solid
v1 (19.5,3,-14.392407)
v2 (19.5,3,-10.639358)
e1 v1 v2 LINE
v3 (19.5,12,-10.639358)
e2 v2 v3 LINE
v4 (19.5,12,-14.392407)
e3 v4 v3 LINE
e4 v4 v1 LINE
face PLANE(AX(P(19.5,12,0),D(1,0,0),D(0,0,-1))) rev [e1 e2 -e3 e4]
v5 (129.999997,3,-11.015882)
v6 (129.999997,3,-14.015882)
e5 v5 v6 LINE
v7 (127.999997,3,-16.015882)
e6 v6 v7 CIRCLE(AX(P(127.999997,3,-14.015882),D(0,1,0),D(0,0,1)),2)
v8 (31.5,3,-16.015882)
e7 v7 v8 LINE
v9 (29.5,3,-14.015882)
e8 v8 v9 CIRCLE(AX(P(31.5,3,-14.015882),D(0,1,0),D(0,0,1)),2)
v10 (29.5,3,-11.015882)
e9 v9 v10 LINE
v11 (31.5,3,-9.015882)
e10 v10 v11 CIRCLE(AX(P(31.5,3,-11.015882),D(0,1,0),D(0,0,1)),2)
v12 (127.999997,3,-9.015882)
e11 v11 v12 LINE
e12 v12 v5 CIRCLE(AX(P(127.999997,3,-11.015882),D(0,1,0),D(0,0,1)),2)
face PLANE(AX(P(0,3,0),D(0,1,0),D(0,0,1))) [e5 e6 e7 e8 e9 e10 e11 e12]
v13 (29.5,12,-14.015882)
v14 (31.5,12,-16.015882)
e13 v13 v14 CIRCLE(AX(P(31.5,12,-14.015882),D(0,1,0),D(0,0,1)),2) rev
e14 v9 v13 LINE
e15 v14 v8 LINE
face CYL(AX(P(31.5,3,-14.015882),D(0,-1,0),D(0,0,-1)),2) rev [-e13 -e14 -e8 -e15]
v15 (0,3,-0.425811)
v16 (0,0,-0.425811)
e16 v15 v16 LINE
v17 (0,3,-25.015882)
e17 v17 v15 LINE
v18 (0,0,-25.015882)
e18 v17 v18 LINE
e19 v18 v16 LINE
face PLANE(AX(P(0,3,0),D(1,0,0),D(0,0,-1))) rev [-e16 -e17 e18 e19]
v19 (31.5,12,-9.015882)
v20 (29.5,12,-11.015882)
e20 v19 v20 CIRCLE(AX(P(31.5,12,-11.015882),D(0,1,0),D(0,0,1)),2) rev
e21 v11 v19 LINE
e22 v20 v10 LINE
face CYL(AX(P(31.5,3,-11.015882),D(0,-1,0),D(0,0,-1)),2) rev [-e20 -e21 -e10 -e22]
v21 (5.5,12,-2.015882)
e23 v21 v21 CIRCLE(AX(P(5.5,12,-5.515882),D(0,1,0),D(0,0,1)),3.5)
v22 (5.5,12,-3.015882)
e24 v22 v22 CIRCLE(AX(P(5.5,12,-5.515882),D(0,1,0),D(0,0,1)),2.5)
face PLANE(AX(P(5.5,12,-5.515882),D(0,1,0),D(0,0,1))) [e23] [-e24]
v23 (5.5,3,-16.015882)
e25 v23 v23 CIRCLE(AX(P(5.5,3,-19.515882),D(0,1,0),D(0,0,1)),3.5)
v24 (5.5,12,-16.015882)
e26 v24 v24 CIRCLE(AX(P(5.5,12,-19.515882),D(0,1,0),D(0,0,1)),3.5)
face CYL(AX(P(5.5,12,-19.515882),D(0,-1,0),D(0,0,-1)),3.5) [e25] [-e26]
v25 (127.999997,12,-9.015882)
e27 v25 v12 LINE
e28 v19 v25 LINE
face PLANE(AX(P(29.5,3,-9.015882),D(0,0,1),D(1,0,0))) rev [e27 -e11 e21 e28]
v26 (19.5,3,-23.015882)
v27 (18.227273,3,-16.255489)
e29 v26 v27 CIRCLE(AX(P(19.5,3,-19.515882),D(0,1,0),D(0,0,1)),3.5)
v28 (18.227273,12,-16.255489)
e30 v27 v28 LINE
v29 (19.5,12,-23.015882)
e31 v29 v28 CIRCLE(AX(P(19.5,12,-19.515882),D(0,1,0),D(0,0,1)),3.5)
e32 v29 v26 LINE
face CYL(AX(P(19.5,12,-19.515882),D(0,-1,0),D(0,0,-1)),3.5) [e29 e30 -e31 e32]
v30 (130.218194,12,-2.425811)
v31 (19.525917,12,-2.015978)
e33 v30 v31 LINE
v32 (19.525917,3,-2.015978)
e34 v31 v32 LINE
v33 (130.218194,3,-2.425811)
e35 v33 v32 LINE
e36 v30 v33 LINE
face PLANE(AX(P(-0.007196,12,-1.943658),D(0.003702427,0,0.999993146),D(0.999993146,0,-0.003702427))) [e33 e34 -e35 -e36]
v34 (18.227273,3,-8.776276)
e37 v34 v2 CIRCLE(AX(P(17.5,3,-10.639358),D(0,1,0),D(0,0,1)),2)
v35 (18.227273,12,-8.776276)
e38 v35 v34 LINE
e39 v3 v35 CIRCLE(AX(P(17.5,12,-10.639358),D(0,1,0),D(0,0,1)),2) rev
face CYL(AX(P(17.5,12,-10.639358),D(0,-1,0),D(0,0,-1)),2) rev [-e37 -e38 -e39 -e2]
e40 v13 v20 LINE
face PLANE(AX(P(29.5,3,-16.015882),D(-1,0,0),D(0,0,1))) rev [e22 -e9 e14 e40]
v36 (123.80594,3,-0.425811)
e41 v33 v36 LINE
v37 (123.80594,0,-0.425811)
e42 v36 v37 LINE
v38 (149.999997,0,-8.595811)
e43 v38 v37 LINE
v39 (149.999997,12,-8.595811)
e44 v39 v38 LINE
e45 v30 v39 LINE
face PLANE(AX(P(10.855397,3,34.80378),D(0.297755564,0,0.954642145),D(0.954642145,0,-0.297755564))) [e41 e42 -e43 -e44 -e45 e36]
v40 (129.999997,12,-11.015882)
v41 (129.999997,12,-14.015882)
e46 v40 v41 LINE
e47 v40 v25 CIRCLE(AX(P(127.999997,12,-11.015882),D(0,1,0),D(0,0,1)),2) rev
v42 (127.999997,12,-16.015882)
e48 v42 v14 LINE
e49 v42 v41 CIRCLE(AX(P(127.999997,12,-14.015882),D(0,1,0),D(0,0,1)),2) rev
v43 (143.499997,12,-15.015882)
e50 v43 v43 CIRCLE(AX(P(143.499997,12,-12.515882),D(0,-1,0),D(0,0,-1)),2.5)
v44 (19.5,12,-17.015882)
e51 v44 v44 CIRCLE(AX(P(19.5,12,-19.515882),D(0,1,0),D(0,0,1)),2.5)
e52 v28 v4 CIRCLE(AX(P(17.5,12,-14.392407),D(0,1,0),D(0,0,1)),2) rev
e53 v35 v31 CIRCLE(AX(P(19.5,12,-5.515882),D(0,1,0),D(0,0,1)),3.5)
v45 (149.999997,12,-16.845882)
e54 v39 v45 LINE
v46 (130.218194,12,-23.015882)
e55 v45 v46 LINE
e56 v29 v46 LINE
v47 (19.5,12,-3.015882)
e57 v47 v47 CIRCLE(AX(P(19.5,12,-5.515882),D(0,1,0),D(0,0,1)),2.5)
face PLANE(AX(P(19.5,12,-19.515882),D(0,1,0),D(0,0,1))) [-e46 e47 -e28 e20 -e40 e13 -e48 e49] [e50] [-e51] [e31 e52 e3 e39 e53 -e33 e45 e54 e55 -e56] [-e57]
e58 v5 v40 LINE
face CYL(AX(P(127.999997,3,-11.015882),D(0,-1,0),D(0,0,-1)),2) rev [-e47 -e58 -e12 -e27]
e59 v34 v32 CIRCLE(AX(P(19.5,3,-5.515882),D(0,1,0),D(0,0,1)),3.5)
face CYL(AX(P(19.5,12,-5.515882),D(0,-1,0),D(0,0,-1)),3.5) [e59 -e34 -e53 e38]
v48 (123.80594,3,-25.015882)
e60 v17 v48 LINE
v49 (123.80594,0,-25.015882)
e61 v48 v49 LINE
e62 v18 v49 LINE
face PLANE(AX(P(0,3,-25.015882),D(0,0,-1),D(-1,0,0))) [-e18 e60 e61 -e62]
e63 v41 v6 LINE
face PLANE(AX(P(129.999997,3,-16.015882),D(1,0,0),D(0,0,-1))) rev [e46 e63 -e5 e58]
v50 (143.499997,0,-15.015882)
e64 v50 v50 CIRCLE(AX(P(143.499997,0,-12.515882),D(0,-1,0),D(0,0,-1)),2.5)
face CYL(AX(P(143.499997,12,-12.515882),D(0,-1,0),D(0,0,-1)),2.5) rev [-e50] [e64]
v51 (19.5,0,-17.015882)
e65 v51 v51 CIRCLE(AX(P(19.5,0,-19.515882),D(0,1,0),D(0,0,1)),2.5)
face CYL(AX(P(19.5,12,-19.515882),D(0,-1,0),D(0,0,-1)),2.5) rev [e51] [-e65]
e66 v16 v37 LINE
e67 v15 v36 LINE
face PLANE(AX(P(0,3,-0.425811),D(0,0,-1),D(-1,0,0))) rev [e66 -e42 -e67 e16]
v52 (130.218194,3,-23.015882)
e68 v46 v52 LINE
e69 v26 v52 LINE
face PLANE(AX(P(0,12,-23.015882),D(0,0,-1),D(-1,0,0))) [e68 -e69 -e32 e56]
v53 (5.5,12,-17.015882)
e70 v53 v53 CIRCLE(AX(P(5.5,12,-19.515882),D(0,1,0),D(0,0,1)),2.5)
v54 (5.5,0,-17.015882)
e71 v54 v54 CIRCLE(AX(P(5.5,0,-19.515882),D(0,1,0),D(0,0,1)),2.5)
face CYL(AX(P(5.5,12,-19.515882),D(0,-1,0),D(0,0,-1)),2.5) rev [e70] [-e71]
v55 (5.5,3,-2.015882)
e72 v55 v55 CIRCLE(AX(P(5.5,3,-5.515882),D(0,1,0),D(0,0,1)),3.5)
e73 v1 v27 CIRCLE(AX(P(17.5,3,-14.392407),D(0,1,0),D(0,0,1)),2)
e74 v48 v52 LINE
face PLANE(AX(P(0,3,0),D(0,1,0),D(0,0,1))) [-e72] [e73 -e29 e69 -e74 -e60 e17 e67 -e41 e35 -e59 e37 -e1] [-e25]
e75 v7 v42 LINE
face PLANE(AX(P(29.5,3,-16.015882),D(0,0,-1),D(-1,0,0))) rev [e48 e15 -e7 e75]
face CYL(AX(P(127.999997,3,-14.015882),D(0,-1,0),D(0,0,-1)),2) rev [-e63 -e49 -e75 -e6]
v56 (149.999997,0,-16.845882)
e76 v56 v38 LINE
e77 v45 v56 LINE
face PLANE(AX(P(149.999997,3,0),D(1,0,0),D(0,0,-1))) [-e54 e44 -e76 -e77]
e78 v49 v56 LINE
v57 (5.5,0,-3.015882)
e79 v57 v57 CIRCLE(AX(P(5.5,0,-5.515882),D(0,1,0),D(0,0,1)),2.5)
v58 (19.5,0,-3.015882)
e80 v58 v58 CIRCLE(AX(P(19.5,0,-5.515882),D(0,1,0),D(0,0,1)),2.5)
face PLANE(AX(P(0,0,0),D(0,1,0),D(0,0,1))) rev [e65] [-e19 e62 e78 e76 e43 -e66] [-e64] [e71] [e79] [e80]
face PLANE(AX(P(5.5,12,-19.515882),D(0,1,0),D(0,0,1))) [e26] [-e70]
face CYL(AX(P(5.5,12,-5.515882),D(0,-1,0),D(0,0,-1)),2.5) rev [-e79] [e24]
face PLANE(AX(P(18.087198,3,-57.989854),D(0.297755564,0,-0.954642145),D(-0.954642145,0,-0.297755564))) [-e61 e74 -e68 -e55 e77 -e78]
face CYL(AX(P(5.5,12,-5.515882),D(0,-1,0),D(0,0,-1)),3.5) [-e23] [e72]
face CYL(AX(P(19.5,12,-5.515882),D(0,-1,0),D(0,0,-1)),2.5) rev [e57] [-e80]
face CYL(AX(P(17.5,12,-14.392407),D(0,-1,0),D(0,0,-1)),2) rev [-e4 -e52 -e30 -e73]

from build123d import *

# Parameters (mm, degrees)
SKETCH_2_W          = 123.80594
SKETCH_2_H          = 24.590071156
EXTRUDE_2_DEPTH     = 3
SKETCH_3_R          = 3.5
SKETCH_3_R_2        = 2.5
EXTRUDE_3_DEPTH     = 9
EXTRUDE_4_DEPTH     = 9
SKETCH_7_W          = 100.499997397
SKETCH_7_H          = 7
CUT_EXTRUDE_1_DEPTH = 9
SKETCH_8_R          = 2.5
CUT_EXTRUDE_2_DEPTH = 153.544398733
FILLET_1_R          = 2
CUT_EXTRUDE_START   = -9
SKETCH_9_R          = 2.5
CUT_EXTRUDE_3_DEPTH = 9


# Read off the part's stored shape, not the designer's step: 凸台-拉伸4
with BuildPart() as part:
    # 草图2 → 凸台-拉伸2 (new body)
    with BuildSketch(Plane(origin=(0, 0, 0), x_dir=(1, 0, 0), z_dir=(0, 1, 0))):
        with Locations((61.90297, 12.720846688)):
            Rectangle(SKETCH_2_W, SKETCH_2_H)
        Polygon((149.999997397, 8.59581111), (123.80594, 0.42581111), (123.80594, 25.015882266), (149.999997397, 16.845882266), align=None)
    extrude(amount=EXTRUDE_2_DEPTH)

    # 草图3 → 凸台-拉伸3 (add)
    # profile 1 of 4: a face of its own
    with BuildSketch(Plane(origin=(0, 3, 0), x_dir=(1, 0, 0), z_dir=(0, 1, 0))):
        with Locations(Location((5.5, 19.515882266, 0), (0, 0, 270))):
            Circle(SKETCH_3_R)
        with Locations(Location((5.5, 19.515882266, 0), (0, 0, 270))):
            Circle(SKETCH_3_R_2, mode=Mode.SUBTRACT)
    # profile 2 of 4: a face of its own
    with BuildSketch(Plane(origin=(0, 3, 0), x_dir=(1, 0, 0), z_dir=(0, 1, 0))):
        with Locations(Location((19.5, 19.515882266, 0), (0, 0, 270))):
            Circle(SKETCH_3_R)
        with Locations(Location((19.5, 19.515882266, 0), (0, 0, 270))):
            Circle(SKETCH_3_R_2, mode=Mode.SUBTRACT)
    # profile 3 of 4: a face of its own
    with BuildSketch(Plane(origin=(0, 3, 0), x_dir=(1, 0, 0), z_dir=(0, 1, 0))):
        with Locations(Location((19.5, 5.515882266, 0), (0, 0, 270))):
            Circle(SKETCH_3_R)
        with Locations(Location((19.5, 5.515882266, 0), (0, 0, 270))):
            Circle(SKETCH_3_R_2, mode=Mode.SUBTRACT)
    # profile 4 of 4: a face of its own
    with BuildSketch(Plane(origin=(0, 3, 0), x_dir=(1, 0, 0), z_dir=(0, 1, 0))):
        with Locations(Location((5.5, 5.515882266, 0), (0, 0, 270))):
            Circle(SKETCH_3_R)
        with Locations(Location((5.5, 5.515882266, 0), (0, 0, 270))):
            Circle(SKETCH_3_R_2, mode=Mode.SUBTRACT)
    extrude(amount=EXTRUDE_3_DEPTH)

    # 凸台-拉伸4 outline → 凸台-拉伸4 (add)
    with BuildSketch(Plane(origin=(0, 3, 0), x_dir=(1, 0, 0), z_dir=(0, 1, 0))):
        with BuildLine():
            Line((19.525916812, 2.015978222), (130.218193953, 2.42581111))
            Line((130.218193953, 2.42581111), (149.999997397, 8.59581111))
            Line((149.999997397, 8.59581111), (149.999997397, 16.845882266))
            Line((149.999997397, 16.845882266), (130.218193953, 23.015882266))
            Line((130.218193953, 23.015882266), (19.5, 23.015882266))
            ThreePointArc((19.5, 23.015882266), (23, 19.515882266), (19.5, 16.015882266))
            Line((19.5, 16.015882266), (19.5, 9.015882266))
            ThreePointArc((19.5, 9.015882266), (22.999976011, 5.528840761), (19.525916812, 2.015978222))
        make_face()
    extrude(amount=EXTRUDE_4_DEPTH)

    # 草图7 → 切除-拉伸1 (cut)
    with BuildSketch(Plane(origin=(0, 12, 0), x_dir=(1, 0, 0), z_dir=(0, 1, 0))):
        with Locations((79.749998699, 12.515882266)):
            Rectangle(SKETCH_7_W, SKETCH_7_H)
    extrude(amount=-CUT_EXTRUDE_1_DEPTH, mode=Mode.SUBTRACT)

    # 草图8 → 切除-拉伸2 (cut, through all)
    with BuildSketch(Plane.XZ):
        with Locations(Location((143.499997397, -12.515882266, 0), (0, 0, 270))):
            Circle(SKETCH_8_R)
    extrude(amount=-CUT_EXTRUDE_2_DEPTH, mode=Mode.SUBTRACT)

    # 圆角1
    fillet_1_edges = [part.edges().sort_by_distance(p)[0] for p in [
        (19.5, 7.5, -16.015882266),
        (19.5, 7.5, -9.015882266),
        (29.5, 7.5, -9.015882266),
        (29.5, 7.5, -16.015882266),
        (129.999997397, 7.5, -16.015882266),
        (129.999997397, 7.5, -9.015882266),
    ]]
    fillet(fillet_1_edges, radius=FILLET_1_R)

    # 草图9 → 切除-拉伸3 (cut)
    with BuildSketch(Plane(origin=(0, 3, 0), x_dir=(1, 0, 0), z_dir=(0, 1, 0)).offset(CUT_EXTRUDE_START)):
        with Locations(Location((5.5, 5.515882266, 0), (0, 0, 270))):
            Circle(SKETCH_9_R)
        with Locations(Location((19.5, 5.515882266, 0), (0, 0, 270))):
            Circle(SKETCH_9_R)
        with Locations(Location((19.5, 19.515882266, 0), (0, 0, 270))):
            Circle(SKETCH_9_R)
        with Locations(Location((5.5, 19.515882266, 0), (0, 0, 270))):
            Circle(SKETCH_9_R)
    extrude(amount=CUT_EXTRUDE_3_DEPTH, mode=Mode.SUBTRACT)


solid = part.part
